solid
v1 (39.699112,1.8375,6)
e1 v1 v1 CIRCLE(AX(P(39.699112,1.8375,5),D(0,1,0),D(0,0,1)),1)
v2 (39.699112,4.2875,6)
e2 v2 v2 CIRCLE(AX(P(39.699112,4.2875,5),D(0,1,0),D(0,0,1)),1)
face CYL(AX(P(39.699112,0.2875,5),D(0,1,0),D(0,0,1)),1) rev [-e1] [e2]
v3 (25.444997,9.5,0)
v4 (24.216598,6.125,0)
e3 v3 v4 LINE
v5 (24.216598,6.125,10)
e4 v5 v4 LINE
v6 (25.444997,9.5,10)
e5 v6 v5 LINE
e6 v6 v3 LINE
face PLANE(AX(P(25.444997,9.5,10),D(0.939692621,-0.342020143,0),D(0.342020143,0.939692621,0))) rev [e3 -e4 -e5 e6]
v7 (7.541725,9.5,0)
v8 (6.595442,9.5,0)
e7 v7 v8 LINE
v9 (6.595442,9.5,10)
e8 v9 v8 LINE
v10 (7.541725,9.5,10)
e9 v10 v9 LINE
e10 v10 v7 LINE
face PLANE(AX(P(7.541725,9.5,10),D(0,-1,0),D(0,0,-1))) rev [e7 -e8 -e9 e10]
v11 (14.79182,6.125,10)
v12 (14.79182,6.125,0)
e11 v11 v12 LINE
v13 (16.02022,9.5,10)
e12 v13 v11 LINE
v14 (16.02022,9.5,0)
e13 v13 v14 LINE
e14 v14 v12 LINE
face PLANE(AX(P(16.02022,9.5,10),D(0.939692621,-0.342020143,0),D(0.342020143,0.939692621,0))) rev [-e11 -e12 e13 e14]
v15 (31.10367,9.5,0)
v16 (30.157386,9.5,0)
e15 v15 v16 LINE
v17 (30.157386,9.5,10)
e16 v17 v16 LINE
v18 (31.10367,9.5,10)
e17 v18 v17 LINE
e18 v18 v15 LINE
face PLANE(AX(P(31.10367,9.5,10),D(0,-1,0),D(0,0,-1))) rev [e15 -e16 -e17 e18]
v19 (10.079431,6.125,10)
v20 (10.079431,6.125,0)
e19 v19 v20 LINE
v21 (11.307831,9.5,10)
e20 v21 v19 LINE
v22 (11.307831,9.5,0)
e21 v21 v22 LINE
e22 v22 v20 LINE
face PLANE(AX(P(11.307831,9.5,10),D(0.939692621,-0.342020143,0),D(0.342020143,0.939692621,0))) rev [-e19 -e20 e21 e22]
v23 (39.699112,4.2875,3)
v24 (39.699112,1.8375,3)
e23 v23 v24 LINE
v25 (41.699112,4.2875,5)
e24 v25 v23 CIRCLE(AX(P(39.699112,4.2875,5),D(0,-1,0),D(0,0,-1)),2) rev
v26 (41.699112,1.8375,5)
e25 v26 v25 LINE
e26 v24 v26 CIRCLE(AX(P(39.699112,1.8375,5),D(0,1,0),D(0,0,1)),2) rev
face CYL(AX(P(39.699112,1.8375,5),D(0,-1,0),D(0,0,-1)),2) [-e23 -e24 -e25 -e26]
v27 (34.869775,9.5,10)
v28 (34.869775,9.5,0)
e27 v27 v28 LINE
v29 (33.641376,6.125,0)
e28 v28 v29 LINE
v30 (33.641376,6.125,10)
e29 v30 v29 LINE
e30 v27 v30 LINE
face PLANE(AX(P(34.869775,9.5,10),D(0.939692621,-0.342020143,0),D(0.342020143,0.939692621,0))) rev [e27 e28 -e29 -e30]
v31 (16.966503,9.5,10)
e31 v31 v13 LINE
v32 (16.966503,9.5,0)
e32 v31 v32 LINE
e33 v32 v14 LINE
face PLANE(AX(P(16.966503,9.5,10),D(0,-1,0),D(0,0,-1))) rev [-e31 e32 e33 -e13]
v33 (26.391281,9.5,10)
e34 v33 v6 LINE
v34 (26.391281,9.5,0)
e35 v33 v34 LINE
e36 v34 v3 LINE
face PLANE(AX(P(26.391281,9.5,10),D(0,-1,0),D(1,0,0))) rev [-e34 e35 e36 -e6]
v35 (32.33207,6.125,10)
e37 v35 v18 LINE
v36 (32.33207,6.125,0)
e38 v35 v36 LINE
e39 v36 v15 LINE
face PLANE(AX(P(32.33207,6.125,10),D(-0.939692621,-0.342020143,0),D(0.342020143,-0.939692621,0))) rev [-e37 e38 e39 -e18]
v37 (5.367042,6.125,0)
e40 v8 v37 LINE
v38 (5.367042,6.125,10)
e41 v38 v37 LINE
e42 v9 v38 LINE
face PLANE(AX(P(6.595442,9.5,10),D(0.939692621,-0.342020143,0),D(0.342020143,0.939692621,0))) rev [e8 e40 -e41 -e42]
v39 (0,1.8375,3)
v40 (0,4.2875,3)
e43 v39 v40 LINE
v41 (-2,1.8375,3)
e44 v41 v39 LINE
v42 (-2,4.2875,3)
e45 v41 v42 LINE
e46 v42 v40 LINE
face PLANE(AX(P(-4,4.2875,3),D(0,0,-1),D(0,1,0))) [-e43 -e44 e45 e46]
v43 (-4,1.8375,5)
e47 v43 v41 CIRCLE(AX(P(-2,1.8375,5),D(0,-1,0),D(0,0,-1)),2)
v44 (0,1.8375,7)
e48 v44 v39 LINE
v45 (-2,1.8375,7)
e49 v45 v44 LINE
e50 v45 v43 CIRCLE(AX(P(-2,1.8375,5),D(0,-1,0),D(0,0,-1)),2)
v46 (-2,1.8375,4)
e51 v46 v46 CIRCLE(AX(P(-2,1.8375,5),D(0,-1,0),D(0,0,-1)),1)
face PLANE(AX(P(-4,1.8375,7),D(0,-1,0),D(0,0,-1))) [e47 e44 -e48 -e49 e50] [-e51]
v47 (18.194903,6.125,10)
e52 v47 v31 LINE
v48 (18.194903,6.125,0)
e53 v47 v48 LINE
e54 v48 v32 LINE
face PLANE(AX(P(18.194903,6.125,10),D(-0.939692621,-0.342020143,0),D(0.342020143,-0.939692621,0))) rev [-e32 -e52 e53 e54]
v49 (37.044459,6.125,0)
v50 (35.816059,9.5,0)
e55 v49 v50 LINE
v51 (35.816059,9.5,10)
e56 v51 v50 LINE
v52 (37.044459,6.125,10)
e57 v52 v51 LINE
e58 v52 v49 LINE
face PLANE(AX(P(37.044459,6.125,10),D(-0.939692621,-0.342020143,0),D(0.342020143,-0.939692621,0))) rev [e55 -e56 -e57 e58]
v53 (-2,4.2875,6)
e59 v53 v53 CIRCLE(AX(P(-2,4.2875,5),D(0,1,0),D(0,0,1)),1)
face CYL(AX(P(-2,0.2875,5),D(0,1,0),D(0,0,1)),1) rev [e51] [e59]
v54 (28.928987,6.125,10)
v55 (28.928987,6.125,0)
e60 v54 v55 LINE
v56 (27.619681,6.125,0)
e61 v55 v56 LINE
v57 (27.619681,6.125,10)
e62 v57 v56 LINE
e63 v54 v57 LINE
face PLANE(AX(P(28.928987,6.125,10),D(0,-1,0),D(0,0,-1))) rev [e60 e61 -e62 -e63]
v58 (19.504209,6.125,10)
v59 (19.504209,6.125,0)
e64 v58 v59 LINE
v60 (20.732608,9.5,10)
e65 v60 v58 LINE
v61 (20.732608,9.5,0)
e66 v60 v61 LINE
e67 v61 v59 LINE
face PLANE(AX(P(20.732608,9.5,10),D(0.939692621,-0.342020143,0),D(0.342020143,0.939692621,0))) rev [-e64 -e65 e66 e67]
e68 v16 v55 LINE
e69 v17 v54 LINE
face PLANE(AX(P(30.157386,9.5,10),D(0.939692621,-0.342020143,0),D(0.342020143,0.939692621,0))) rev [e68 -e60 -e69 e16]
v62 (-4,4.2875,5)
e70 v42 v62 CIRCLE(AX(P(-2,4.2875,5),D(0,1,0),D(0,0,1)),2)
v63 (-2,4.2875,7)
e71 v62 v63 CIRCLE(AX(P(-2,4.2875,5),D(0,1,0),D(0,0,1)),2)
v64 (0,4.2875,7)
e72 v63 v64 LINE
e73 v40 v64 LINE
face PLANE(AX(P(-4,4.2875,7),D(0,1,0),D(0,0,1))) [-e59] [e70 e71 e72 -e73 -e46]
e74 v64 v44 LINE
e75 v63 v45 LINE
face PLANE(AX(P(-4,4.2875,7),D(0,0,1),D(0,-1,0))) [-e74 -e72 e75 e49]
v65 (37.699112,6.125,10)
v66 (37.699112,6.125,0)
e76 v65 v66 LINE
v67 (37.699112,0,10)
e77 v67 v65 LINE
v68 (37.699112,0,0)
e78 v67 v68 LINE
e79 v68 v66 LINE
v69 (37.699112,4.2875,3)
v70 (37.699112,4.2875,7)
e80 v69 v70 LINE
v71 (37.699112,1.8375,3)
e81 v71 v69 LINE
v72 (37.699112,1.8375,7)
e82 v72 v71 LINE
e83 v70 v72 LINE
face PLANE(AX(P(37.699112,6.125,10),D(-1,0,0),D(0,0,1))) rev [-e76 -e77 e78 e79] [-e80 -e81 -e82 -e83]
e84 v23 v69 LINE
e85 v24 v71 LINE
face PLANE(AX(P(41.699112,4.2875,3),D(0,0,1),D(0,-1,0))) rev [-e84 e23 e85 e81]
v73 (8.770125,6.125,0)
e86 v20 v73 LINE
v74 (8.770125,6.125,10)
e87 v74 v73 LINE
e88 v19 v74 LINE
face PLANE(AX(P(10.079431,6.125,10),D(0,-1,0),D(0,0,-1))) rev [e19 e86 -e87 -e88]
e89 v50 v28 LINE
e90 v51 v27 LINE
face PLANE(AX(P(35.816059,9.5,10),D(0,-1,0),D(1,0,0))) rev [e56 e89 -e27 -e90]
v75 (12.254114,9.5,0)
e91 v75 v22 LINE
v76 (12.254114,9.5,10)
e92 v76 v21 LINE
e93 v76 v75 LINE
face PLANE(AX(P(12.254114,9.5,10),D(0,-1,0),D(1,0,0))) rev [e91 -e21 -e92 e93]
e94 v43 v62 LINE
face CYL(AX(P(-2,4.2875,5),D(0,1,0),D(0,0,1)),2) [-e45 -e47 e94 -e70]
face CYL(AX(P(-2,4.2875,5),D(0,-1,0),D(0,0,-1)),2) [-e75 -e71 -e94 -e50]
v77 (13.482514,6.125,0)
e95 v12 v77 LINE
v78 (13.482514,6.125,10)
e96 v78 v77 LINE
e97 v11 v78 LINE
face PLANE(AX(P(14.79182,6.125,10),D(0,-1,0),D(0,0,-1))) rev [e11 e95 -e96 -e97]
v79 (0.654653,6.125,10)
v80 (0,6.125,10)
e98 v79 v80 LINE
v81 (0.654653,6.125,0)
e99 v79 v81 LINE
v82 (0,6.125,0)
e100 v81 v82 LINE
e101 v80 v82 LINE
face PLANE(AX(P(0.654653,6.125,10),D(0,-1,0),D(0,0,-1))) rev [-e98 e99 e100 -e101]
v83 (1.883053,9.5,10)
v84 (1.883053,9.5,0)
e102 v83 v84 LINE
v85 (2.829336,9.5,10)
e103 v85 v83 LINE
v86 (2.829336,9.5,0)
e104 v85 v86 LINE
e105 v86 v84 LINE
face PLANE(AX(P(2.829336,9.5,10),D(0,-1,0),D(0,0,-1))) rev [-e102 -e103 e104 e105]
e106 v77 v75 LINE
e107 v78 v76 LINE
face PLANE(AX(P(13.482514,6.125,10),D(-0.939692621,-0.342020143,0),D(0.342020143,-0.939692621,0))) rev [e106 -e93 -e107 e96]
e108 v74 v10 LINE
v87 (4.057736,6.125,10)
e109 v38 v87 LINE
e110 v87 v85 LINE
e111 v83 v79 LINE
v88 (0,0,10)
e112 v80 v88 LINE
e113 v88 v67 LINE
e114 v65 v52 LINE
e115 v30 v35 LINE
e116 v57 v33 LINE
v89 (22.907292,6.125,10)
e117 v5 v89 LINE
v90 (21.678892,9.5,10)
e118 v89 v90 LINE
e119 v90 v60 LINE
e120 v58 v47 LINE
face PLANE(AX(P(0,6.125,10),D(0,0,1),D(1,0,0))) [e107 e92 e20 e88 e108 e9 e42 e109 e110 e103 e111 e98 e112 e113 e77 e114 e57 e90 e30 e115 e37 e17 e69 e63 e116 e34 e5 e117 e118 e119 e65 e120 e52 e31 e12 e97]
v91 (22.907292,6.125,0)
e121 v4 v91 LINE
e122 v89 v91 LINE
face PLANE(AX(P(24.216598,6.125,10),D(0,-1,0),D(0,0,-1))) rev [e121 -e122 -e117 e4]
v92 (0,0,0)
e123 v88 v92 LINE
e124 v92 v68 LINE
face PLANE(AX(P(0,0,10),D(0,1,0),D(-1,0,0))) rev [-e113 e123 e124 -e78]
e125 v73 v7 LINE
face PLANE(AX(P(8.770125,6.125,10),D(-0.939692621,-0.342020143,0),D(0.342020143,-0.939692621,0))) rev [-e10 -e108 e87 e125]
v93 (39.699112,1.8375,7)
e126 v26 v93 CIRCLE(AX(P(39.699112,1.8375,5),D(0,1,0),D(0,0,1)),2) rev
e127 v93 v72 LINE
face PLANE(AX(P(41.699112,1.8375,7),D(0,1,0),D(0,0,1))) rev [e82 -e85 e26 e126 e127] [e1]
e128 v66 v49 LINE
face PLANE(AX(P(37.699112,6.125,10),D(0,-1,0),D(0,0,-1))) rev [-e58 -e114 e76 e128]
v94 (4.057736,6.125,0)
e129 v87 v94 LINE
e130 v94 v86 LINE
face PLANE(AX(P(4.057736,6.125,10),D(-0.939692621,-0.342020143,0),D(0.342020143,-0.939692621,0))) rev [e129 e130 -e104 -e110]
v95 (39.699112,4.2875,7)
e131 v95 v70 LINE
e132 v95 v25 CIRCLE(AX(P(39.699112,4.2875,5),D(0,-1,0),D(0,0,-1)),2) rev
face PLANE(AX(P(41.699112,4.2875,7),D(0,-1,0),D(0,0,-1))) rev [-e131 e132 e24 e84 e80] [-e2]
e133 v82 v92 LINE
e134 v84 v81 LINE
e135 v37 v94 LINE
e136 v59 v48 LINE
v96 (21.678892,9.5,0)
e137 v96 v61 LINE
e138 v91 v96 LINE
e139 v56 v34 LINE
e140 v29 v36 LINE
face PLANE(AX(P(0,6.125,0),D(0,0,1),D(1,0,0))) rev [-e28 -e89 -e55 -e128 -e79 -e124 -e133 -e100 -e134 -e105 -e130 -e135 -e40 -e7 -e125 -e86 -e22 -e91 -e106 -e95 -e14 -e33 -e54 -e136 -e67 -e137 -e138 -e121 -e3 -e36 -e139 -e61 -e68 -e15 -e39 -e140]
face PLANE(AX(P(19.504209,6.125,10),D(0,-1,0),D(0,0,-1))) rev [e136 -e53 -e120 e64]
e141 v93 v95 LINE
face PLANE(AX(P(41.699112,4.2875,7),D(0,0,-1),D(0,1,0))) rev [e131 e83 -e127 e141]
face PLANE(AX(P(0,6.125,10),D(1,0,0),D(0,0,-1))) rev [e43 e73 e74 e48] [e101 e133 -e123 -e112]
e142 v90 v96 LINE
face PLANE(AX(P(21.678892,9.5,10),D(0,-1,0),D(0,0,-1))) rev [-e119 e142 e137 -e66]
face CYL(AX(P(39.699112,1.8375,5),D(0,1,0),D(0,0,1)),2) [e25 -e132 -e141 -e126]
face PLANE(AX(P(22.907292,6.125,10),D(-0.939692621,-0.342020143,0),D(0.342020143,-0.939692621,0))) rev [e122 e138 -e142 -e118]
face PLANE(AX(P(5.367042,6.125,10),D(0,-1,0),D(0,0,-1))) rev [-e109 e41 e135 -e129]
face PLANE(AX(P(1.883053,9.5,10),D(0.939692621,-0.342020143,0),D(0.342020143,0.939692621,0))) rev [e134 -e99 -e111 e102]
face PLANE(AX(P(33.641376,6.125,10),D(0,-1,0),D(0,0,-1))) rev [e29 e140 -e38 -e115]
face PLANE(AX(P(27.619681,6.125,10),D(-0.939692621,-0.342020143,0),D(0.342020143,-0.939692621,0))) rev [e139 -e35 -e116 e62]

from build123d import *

# Parameters (mm, degrees)
EXTRUIR1_DEPTH = 10
CROQUIS5_W     = 4
CROQUIS5_H     = 2.45
EXTRUIR2_DEPTH = 4
REDONDEO1_R    = 2
CROQUIS6_R     = 1
EXTRUIR3_DEPTH = 4


with BuildPart() as part:
    # Croquis4 → Extruir1 (new body)
    with BuildSketch(Plane.XY):
        Polygon((32.33206977, 6.125), (31.10367023, 9.5), (30.157386445, 9.5), (28.928986905, 6.125), (27.619680795, 6.125), (26.391281255, 9.5), (25.44499747, 9.5), (24.21659793, 6.125), (22.90729182, 6.125), (21.67889228, 9.5), (20.732608495, 9.5), (19.504208955, 6.125), (18.194902845, 6.125), (16.966503305, 9.5), (16.02021952, 9.5), (14.79181998, 6.125), (13.48251387, 6.125), (12.25411433, 9.5), (11.307830545, 9.5), (10.079431005, 6.125), (8.770124895, 6.125), (7.541725355, 9.5), (6.59544157, 9.5), (5.36704203, 6.125), (4.05773592, 6.125), (2.82933638, 9.5), (1.883052595, 9.5), (0.654653055, 6.125), (0, 6.125), (0, 0), (37.6991118, 0), (37.6991118, 6.125), (37.044458745, 6.125), (35.816059205, 9.5), (34.86977542, 9.5), (33.64137588, 6.125), align=None)
    extrude(amount=EXTRUIR1_DEPTH)

    # Croquis5 → Extruir2 (add)
    with BuildSketch(Plane(origin=(37.6991118, 0, 0), x_dir=(0, 0, -1), z_dir=(1, 0, 0))):
        with Locations((-5, 3.0625)):
            Rectangle(CROQUIS5_W, CROQUIS5_H)
    extruir2 = extrude(amount=EXTRUIR2_DEPTH)

    # Simetría1: Extruir2 across plane
    add(extruir2.mirror(Plane(origin=(18.8495559, 0, 0), x_dir=(0, 0, 1), z_dir=(1, 0, 0))))

    # Redondeo1
    redondeo1_edges = [part.edges().sort_by_distance(p)[0] for p in [
        (41.6991118, 3.0625, 7),
        (41.6991118, 3.0625, 3),
        (-4, 3.0625, 3),
        (-4, 3.0625, 7),
    ]]
    fillet(redondeo1_edges, radius=REDONDEO1_R - 0.0001)  # a hair under: the kernel refuses the full size

    # Croquis6 → Extruir3 (cut)
    with BuildSketch(Plane(origin=(0, 4.2875, 0), x_dir=(1, 0, 0), z_dir=(0, 1, 0))):
        with Locations(Location((39.6991118, -5, 0), (0, 0, 270))):
            Circle(CROQUIS6_R)
        with Locations(Location((-2, -5, 0), (0, 0, 270))):
            Circle(CROQUIS6_R)
    extrude(amount=-EXTRUIR3_DEPTH, mode=Mode.SUBTRACT)


solid = part.part
